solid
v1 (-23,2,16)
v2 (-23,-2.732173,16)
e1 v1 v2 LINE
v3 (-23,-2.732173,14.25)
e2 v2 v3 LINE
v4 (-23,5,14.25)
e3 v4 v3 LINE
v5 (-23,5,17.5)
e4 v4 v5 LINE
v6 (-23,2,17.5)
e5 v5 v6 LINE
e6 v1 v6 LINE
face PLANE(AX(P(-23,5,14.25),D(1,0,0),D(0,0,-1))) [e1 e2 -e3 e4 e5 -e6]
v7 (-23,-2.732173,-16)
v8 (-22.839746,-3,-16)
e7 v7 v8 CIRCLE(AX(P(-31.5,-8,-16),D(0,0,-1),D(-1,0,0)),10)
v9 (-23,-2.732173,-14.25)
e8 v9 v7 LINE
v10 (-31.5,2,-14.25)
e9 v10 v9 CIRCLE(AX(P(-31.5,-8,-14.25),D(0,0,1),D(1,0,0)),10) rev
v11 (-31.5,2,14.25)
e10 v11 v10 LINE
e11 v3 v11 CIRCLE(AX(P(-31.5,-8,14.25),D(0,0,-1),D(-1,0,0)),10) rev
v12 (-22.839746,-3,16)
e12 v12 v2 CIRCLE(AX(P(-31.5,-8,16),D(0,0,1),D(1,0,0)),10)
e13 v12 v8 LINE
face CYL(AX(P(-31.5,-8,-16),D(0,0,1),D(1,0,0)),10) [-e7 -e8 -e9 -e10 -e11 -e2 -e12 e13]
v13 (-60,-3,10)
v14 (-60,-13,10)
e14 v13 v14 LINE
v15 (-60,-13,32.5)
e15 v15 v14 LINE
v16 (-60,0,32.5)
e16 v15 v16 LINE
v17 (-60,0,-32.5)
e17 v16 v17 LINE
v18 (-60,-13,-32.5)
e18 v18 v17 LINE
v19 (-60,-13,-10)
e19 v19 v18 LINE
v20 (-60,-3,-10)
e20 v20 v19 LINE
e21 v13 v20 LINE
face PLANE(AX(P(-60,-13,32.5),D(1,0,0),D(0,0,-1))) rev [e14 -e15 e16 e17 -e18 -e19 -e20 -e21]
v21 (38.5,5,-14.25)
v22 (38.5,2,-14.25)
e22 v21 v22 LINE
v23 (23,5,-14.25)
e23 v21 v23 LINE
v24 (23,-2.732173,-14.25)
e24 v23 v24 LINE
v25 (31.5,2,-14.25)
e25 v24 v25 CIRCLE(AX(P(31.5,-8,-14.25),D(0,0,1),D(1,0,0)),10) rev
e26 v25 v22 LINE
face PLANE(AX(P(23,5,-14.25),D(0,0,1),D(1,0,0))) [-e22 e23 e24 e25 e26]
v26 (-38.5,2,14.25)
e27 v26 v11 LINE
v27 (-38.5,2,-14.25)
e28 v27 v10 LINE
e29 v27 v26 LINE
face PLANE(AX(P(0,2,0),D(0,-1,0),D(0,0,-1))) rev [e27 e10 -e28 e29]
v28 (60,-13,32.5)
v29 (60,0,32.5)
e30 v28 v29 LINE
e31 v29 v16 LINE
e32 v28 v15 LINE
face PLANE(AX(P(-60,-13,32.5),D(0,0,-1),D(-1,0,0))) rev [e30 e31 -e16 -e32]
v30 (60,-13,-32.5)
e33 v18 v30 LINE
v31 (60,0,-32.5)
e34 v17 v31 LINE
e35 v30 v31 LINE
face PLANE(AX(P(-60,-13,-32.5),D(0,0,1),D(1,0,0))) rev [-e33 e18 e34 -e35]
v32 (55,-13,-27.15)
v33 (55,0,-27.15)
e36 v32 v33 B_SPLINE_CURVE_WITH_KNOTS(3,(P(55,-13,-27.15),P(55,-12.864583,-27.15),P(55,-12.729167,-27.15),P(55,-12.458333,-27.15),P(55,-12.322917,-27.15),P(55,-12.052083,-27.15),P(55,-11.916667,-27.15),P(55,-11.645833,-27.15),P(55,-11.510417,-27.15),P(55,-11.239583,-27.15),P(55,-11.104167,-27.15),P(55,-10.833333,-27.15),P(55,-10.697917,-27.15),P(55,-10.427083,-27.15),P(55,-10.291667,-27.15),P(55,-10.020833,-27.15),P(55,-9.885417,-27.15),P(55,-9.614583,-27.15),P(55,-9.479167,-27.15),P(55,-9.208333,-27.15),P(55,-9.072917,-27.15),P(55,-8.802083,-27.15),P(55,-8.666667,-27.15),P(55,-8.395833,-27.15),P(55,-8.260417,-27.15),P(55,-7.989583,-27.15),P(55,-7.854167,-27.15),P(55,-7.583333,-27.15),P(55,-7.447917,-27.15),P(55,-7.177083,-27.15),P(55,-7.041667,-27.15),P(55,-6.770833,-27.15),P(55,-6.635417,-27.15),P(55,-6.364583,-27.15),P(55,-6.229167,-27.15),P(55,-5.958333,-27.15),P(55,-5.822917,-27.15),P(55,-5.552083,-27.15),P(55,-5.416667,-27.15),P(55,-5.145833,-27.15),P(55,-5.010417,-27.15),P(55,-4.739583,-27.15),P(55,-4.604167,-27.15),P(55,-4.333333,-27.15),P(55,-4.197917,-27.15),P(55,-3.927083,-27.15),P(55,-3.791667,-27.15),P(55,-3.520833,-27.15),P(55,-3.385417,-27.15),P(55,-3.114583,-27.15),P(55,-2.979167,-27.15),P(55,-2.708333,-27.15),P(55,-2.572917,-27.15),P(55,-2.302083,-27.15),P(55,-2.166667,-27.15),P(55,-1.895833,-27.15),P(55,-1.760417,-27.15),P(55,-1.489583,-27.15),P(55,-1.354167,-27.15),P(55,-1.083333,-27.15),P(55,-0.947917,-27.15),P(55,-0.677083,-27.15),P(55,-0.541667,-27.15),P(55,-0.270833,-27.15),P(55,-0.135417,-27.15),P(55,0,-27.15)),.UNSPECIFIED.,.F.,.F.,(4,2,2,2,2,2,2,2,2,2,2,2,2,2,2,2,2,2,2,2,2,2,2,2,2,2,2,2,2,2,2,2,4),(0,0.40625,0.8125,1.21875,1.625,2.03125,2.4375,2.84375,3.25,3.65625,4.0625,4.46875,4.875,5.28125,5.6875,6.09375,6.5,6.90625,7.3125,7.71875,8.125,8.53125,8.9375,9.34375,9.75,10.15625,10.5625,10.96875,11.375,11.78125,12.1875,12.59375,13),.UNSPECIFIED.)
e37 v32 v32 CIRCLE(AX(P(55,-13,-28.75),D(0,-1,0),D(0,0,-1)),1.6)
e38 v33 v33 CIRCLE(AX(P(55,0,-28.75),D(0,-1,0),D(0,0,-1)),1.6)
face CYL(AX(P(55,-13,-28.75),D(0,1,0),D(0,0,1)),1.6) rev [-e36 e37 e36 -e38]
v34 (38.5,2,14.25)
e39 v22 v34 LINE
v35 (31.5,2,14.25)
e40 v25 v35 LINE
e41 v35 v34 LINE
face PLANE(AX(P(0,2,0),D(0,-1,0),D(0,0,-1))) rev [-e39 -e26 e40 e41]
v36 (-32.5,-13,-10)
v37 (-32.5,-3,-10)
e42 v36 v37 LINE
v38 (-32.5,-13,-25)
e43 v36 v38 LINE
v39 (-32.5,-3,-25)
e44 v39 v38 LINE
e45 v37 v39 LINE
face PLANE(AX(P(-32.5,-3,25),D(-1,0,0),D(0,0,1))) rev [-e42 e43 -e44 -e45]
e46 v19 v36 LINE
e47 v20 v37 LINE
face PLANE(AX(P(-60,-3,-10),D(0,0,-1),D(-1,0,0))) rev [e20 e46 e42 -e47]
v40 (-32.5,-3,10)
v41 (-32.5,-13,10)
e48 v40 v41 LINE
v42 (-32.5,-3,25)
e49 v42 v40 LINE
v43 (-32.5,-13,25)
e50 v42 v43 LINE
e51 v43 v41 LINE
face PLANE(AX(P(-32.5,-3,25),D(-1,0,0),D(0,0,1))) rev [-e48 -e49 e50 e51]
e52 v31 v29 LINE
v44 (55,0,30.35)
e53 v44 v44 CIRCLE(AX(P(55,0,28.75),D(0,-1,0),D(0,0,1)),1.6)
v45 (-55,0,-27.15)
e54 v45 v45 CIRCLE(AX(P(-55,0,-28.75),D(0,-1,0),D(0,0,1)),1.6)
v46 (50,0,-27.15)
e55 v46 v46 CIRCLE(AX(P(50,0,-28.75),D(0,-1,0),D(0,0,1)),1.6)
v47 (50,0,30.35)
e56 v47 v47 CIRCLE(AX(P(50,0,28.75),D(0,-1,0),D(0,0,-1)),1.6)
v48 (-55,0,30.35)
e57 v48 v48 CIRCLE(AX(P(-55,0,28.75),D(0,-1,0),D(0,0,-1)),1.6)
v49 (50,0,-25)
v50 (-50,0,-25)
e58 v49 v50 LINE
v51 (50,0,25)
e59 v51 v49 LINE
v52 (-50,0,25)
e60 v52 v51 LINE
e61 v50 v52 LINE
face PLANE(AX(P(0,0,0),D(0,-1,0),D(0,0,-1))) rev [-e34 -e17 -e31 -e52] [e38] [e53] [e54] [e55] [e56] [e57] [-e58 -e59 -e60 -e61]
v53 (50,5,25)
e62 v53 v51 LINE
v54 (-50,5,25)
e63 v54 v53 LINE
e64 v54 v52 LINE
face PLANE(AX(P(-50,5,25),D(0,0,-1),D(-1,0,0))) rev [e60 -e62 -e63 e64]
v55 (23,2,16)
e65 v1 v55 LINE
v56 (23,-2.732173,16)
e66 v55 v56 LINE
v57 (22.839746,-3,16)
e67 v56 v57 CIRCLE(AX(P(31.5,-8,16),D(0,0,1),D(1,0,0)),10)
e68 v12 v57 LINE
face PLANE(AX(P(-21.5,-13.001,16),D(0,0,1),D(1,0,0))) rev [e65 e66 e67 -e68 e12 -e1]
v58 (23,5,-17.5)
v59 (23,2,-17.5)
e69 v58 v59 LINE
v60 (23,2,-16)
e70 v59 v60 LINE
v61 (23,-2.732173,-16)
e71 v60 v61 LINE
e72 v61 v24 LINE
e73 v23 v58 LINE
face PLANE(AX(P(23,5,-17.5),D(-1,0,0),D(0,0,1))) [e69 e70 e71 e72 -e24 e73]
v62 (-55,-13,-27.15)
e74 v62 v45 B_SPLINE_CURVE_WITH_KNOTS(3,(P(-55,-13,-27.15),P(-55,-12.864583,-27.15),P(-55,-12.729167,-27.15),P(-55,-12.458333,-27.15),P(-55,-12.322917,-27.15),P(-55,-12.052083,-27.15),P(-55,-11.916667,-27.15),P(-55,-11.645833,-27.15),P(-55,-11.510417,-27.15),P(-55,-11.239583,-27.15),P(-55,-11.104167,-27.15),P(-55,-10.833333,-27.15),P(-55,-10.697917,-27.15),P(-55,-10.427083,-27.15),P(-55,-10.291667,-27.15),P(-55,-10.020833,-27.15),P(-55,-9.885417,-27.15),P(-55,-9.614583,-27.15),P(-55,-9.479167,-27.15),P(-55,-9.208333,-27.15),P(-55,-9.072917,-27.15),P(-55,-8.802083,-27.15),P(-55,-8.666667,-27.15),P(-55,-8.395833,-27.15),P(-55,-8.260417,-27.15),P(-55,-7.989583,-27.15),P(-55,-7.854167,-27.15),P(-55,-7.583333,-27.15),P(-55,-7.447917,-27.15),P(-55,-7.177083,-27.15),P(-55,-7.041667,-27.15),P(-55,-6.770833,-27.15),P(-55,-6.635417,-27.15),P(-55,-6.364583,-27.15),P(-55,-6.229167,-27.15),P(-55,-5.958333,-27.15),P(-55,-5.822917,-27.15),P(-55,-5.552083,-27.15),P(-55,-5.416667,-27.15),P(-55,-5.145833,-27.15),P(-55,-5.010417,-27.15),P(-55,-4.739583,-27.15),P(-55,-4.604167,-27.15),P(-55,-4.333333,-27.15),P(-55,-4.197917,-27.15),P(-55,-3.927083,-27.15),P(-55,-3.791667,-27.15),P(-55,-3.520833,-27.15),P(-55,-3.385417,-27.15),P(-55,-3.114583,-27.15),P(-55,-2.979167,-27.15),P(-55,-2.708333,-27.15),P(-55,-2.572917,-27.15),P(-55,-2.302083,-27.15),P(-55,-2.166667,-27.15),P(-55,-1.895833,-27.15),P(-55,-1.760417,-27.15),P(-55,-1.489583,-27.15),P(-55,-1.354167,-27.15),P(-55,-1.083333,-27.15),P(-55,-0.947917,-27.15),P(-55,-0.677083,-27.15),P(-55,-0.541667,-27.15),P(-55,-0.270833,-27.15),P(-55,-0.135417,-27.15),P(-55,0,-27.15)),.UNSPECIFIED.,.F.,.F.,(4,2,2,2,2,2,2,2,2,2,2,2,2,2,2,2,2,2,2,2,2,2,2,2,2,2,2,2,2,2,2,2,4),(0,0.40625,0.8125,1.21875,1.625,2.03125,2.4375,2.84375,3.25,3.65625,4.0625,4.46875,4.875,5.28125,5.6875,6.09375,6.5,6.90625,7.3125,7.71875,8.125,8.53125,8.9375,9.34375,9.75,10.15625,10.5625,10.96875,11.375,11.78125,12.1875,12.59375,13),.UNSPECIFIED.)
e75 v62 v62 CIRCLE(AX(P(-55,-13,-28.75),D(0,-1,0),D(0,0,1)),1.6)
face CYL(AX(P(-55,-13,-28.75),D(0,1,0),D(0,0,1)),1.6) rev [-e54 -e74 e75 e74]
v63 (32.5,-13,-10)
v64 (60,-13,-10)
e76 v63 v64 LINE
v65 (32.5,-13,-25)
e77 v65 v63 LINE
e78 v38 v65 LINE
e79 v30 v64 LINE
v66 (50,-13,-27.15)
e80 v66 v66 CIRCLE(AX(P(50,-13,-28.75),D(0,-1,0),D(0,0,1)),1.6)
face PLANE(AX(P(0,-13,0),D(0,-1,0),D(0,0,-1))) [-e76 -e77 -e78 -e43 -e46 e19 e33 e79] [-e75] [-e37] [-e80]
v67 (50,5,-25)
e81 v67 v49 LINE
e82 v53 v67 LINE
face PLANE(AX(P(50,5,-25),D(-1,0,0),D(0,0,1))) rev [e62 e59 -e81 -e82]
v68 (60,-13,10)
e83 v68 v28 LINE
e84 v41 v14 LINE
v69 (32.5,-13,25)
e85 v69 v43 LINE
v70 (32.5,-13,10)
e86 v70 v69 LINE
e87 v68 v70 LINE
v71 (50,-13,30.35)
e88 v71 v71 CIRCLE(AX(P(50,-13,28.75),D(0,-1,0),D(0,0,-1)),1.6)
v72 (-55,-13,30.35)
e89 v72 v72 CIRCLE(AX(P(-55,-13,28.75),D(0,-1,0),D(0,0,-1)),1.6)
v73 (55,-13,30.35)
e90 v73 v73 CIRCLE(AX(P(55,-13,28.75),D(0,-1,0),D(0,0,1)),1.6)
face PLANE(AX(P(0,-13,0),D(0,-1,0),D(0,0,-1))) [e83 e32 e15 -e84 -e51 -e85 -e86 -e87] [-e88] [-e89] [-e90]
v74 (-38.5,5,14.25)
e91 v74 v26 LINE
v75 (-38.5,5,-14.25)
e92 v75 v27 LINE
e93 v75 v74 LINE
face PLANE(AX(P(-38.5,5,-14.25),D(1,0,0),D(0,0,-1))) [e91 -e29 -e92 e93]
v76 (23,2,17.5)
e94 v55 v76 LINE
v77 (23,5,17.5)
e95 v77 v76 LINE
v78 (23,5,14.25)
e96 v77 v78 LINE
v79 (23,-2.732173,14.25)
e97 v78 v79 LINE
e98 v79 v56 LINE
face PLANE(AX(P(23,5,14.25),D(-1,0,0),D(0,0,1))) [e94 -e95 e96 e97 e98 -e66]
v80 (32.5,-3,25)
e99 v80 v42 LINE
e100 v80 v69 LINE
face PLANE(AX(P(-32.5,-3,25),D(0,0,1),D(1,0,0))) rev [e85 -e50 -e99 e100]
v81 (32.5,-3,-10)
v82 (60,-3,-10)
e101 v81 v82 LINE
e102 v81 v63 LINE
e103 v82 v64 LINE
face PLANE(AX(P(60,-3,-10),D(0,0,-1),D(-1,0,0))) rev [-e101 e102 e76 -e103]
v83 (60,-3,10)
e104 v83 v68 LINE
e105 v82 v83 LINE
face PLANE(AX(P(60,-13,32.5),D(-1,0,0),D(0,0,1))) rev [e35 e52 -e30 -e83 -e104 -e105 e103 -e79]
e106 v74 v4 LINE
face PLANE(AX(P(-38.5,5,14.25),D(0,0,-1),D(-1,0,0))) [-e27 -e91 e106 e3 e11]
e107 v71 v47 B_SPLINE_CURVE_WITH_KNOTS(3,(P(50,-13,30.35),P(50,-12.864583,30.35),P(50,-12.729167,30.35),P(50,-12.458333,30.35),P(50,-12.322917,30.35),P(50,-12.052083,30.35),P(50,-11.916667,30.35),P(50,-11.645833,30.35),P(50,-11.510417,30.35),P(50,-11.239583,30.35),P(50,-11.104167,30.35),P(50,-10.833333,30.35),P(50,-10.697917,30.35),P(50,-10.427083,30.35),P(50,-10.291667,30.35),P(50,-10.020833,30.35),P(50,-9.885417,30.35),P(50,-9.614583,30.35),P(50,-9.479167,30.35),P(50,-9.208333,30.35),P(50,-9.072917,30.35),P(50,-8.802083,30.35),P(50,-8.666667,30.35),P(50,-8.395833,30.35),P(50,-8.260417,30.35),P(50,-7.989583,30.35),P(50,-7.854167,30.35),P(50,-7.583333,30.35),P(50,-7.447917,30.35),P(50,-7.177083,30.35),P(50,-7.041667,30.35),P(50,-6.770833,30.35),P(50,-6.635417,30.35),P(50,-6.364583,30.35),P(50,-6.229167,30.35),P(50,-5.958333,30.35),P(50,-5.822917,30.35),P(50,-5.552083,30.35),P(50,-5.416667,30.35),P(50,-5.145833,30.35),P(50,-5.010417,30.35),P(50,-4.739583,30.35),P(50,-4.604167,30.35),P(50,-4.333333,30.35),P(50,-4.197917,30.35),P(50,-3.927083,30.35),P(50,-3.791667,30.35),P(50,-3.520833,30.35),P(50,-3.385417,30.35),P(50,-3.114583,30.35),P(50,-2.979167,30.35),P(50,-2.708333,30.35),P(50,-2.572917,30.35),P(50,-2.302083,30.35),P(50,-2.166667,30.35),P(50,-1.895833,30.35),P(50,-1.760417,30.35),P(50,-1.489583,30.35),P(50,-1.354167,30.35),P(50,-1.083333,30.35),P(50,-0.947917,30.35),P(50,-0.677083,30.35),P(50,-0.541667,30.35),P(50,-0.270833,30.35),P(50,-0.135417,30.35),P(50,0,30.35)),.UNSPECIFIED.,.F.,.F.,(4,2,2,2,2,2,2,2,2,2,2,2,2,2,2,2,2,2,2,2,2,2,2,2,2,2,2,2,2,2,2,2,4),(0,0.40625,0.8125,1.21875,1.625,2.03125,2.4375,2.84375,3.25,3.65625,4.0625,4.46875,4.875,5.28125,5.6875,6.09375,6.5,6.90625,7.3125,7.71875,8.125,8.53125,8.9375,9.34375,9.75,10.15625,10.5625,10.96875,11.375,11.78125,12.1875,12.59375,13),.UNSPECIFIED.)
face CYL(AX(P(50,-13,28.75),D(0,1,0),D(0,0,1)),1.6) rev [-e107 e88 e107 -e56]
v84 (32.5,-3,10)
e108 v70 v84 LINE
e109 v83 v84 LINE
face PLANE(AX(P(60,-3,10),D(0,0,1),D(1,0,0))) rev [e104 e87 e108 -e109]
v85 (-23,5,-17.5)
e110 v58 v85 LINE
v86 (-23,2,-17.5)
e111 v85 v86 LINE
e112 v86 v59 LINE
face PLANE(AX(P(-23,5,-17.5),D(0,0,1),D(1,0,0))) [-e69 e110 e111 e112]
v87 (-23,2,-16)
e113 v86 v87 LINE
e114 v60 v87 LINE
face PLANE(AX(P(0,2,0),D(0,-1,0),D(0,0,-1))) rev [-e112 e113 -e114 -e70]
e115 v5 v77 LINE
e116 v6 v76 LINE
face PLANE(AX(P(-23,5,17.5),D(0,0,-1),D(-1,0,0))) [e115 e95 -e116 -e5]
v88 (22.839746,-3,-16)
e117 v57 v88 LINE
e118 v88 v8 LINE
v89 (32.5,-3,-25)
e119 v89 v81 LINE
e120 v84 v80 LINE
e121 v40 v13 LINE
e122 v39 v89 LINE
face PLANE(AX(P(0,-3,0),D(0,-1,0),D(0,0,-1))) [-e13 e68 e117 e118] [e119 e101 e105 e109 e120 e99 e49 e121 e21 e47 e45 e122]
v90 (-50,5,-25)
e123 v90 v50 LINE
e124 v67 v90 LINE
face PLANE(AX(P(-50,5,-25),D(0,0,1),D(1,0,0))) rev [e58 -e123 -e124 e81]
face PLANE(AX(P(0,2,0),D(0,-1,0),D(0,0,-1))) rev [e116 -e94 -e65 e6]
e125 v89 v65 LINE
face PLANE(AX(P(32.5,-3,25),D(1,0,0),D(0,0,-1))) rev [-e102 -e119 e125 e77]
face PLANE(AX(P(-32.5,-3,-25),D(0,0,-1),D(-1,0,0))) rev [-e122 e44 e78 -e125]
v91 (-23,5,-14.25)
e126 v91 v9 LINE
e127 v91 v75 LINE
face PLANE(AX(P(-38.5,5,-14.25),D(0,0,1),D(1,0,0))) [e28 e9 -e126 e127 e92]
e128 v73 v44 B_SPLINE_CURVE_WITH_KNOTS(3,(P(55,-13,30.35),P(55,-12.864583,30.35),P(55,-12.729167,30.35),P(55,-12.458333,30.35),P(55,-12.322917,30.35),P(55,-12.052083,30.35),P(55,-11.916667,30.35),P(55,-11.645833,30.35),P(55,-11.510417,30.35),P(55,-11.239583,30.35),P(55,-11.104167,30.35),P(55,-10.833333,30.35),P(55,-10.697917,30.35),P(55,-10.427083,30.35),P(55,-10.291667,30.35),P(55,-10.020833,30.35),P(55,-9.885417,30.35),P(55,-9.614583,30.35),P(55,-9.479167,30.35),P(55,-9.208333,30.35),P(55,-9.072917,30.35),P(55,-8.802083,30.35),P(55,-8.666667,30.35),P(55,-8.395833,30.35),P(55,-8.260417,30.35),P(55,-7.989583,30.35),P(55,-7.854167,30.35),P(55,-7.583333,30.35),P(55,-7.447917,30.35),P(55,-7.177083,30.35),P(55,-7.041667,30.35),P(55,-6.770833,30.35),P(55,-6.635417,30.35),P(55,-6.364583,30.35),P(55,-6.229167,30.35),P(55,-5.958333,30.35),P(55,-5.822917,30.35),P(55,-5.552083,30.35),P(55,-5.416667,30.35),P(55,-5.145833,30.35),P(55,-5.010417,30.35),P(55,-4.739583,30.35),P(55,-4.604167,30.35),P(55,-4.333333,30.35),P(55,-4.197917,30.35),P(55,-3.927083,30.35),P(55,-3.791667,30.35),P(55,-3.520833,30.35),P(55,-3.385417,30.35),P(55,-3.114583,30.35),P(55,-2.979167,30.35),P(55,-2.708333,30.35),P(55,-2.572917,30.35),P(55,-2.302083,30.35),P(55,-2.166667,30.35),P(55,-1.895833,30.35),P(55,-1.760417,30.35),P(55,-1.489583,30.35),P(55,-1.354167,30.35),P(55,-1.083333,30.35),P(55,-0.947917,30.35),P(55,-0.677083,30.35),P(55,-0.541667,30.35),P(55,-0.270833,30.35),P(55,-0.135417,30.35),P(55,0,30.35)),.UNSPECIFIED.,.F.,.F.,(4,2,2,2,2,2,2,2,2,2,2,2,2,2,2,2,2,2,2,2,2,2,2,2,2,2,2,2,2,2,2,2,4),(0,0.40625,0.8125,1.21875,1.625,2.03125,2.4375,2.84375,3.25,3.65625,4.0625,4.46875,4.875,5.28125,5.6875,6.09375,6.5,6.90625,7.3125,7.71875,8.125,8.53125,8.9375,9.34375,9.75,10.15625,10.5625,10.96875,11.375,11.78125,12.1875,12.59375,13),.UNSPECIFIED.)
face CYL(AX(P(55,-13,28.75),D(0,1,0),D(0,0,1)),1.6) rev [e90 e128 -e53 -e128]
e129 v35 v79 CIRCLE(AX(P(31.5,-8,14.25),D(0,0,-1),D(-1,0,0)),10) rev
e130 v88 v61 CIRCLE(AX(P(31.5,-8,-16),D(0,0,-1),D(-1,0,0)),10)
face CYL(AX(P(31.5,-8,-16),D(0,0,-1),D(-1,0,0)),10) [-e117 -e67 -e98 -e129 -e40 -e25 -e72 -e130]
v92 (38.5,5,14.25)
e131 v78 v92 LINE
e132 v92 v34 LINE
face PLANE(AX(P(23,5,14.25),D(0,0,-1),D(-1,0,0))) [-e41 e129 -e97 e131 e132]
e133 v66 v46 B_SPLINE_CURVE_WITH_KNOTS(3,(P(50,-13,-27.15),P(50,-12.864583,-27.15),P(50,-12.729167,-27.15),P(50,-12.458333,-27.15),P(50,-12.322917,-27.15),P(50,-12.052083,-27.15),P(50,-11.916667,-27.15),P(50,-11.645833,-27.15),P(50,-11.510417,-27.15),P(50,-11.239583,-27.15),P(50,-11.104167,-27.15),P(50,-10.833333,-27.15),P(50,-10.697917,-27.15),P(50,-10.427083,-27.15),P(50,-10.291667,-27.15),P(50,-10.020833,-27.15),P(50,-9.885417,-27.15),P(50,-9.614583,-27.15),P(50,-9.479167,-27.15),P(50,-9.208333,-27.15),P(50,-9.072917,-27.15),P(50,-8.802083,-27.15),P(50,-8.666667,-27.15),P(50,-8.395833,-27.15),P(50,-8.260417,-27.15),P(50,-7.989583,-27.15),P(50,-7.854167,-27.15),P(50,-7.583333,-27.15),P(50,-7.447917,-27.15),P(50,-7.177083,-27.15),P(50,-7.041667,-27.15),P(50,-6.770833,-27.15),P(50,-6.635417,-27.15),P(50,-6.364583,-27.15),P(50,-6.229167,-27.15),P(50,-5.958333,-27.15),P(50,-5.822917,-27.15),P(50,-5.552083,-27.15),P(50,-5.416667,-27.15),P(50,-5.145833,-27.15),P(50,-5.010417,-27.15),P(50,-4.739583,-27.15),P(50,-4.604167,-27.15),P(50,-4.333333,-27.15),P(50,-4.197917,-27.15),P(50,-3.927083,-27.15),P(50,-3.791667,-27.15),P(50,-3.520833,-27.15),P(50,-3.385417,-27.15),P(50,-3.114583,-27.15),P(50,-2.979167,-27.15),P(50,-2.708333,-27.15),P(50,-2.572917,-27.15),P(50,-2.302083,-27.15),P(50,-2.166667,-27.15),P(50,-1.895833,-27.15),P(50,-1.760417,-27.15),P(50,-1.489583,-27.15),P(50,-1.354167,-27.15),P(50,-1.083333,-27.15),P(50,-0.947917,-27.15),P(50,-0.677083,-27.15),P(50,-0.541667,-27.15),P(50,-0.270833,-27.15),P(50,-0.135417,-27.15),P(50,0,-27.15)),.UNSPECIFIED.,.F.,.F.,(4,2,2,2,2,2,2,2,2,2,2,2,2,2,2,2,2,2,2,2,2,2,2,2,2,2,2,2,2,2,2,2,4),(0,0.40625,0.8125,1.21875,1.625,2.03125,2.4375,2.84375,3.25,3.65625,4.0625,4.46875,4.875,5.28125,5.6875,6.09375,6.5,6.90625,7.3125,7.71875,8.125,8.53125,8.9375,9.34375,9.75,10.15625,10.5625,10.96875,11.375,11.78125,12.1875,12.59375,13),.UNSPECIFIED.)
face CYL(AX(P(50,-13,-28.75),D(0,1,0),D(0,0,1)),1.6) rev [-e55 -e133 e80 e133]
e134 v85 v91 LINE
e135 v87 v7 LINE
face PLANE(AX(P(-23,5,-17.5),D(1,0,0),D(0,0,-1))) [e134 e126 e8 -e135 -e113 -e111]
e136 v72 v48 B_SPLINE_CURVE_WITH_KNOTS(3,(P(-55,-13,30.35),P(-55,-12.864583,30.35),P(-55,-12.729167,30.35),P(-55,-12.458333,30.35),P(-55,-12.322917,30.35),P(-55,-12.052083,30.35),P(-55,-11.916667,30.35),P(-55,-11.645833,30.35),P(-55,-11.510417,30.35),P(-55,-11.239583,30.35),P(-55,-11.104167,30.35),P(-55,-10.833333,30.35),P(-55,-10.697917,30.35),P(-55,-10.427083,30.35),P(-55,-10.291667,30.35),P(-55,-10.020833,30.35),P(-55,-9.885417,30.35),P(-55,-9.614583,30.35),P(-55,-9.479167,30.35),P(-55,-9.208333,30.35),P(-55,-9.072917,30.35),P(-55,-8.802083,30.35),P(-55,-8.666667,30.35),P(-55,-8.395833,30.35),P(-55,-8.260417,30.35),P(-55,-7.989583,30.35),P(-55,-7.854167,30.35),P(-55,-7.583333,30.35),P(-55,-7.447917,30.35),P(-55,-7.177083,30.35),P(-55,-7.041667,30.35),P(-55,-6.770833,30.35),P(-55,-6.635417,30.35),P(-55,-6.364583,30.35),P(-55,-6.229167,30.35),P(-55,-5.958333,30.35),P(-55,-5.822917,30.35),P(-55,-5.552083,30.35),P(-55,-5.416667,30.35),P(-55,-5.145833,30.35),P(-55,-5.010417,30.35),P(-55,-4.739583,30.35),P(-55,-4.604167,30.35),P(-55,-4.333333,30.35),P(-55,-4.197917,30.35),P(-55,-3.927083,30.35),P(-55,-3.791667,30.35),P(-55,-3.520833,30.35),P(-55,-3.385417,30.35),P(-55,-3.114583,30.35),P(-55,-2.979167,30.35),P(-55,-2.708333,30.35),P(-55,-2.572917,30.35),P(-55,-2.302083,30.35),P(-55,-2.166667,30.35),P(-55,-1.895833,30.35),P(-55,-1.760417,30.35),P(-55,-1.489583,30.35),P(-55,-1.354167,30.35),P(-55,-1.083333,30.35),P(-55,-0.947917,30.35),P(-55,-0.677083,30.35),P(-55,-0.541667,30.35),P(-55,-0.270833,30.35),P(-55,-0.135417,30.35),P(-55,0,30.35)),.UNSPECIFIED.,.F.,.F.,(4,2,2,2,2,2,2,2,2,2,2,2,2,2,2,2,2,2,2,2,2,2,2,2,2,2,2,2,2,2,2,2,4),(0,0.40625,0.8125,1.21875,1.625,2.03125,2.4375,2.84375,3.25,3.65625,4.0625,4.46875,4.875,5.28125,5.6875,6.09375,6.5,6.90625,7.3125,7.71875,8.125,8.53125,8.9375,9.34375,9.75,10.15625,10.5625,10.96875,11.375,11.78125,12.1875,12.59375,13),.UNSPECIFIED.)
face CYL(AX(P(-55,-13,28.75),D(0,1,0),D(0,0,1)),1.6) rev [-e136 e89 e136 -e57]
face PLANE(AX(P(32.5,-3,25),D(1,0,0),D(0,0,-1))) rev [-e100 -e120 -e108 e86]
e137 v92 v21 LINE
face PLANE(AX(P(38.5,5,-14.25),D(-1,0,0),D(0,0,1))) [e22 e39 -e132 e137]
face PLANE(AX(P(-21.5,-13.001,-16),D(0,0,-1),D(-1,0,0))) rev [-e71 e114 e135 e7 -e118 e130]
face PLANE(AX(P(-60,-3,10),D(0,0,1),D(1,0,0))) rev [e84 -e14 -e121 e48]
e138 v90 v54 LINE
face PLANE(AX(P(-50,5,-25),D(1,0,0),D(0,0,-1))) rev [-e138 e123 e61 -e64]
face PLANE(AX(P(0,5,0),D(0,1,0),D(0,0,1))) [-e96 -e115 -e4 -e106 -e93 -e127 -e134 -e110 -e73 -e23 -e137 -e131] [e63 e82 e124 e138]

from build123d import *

# Parameters (mm, degrees)
BOSS_EXTRUDE3_DEPTH = 2
SKETCH1_6_W         = 100
SKETCH1_6_H         = 50
BOSS_EXTRUDE4_DEPTH = 5
SKETCH2_W           = 120
SKETCH2_H           = 65
SKETCH2_R           = 1.6
BOSS_EXTRUDE5_DEPTH = 13
SKETCH2_2_W         = 120
SKETCH2_2_H         = 65
SKETCH2_2_R         = 1.6
BOSS_EXTRUDE6_DEPTH = 3
CUT_EXTRUDE1_REACH  = 71.866
SKETCH7_W           = 43
SKETCH7_H           = 32
FILLET1_R           = 10
SKETCH8_W           = 38.5
SKETCH8_H           = 20
CUT_EXTRUDE2_DEPTH  = 10
SKETCH9_W           = 65
SKETCH9_H           = 50
CUT_EXTRUDE3_DEPTH  = 10


with BuildPart() as part:
    # Sketch1 → Boss-Extrude3 (new body)
    with BuildSketch(Plane(origin=(0, 0, 0), x_dir=(1, 0, 0), z_dir=(0, 1, 0))):
        Polygon((23, -14.25), (23, -17.5), (-23, -17.5), (-23, -14.25), (-38.5, -14.25), (-38.5, 14.25), (-23, 14.25), (-23, 17.5), (23, 17.5), (23, 14.25), (38.5, 14.25), (38.5, -14.25), align=None)
    extrude(amount=BOSS_EXTRUDE3_DEPTH)

    # Sketch1<6> → Boss-Extrude4 (add)
    with BuildSketch(Plane(origin=(0, 0, 0), x_dir=(1, 0, 0), z_dir=(0, 1, 0))):
        Rectangle(SKETCH1_6_W, SKETCH1_6_H)
        Polygon((23, -14.25), (23, -17.5), (-23, -17.5), (-23, -14.25), (-38.5, -14.25), (-38.5, 14.25), (-23, 14.25), (-23, 17.5), (23, 17.5), (23, 14.25), (38.5, 14.25), (38.5, -14.25), align=None, mode=Mode.SUBTRACT)
    extrude(amount=BOSS_EXTRUDE4_DEPTH)

    # Sketch2 → Boss-Extrude5 (add)
    with BuildSketch(Plane.XZ):
        Rectangle(SKETCH2_W, SKETCH2_H)
        with Locations(Location((-55, 28.75, 0), (0, 0, 90))):
            Circle(SKETCH2_R, mode=Mode.SUBTRACT)
        with Locations(Location((55, 28.75, 0), (0, 0, 90))):
            Circle(SKETCH2_R, mode=Mode.SUBTRACT)
        with Locations(Location((55, -28.75, 0), (0, 0, 90))):
            Circle(SKETCH2_R, mode=Mode.SUBTRACT)
        with Locations(Location((-55, -28.75, 0), (0, 0, 90))):
            Circle(SKETCH2_R, mode=Mode.SUBTRACT)
        with Locations(Location((50, 28.75, 0), (0, 0, 90))):
            Circle(SKETCH2_R, mode=Mode.SUBTRACT)
        with Locations(Location((50, -28.75, 0), (0, 0, 90))):
            Circle(SKETCH2_R, mode=Mode.SUBTRACT)
    extrude(amount=BOSS_EXTRUDE5_DEPTH)

    # Sketch2<2> → Boss-Extrude6 (add)
    with BuildSketch(Plane.XZ):
        Rectangle(SKETCH2_2_W, SKETCH2_2_H)
        with Locations(Location((-55, 28.75, 0), (0, 0, 90))):
            Circle(SKETCH2_2_R, mode=Mode.SUBTRACT)
        with Locations(Location((55, 28.75, 0), (0, 0, 90))):
            Circle(SKETCH2_2_R, mode=Mode.SUBTRACT)
        with Locations(Location((55, -28.75, 0), (0, 0, 90))):
            Circle(SKETCH2_2_R, mode=Mode.SUBTRACT)
        with Locations(Location((-55, -28.75, 0), (0, 0, 90))):
            Circle(SKETCH2_2_R, mode=Mode.SUBTRACT)
        with Locations(Location((50, 28.75, 0), (0, 0, 90))):
            Circle(SKETCH2_2_R, mode=Mode.SUBTRACT)
        with Locations(Location((50, -28.75, 0), (0, 0, 90))):
            Circle(SKETCH2_2_R, mode=Mode.SUBTRACT)
    extrude(amount=BOSS_EXTRUDE6_DEPTH)

    # Sketch7 → Cut-Extrude1 (cut, up to next)
    with BuildSketch(Plane(origin=(0, 2, 0), x_dir=(1, 0, 0), z_dir=(0, 1, 0)), mode=Mode.PRIVATE) as cut_extrude1_sk1:
        Rectangle(SKETCH7_W, SKETCH7_H)
    cut_extrude1_tool1 = extrude(cut_extrude1_sk1.sketch, amount=-CUT_EXTRUDE1_REACH, mode=Mode.PRIVATE) & part.part
    add(cut_extrude1_tool1.solids().sort_by_distance((0, 2, 0))[0], mode=Mode.SUBTRACT)

    # Fillet1
    # the kernel refuses this fillet: 10 mm, written as the material it takes off along each edge
    with BuildSketch(Plane(origin=(-21.5, 2, 16), x_dir=(0, -1, 0), z_dir=(0, 0, -1))) as fillet1_piece_1_section:
        with BuildLine():
            CenterArc((FILLET1_R, FILLET1_R), FILLET1_R, 180, 90)
            Line((0, FILLET1_R), (0, 0))
            Line((0, 0), (FILLET1_R, 0))
        make_face()
    fillet1_piece_1 = extrude(amount=32, mode=Mode.PRIVATE)
    fillet1_piece_1 = split(fillet1_piece_1, bisect_by=Plane(origin=(-23, -2.387167078, 15.125), z_dir=(1, 0, 0)), keep=Keep.TOP, mode=Mode.PRIVATE)
    add(fillet1_piece_1, mode=Mode.SUBTRACT)
    with BuildSketch(Plane(origin=(-21.5, 2, 41), x_dir=(0, -1, 0), z_dir=(0, 0, -1))) as fillet1_piece_2_section:
        with BuildLine():
            CenterArc((FILLET1_R, FILLET1_R), FILLET1_R, 180, 90)
            Line((0, FILLET1_R), (0, 0))
            Line((0, 0), (FILLET1_R, 0))
        make_face()
    fillet1_piece_2 = extrude(amount=82, mode=Mode.PRIVATE)
    fillet1_piece_2 = split(fillet1_piece_2, bisect_by=Plane(origin=(-23.780995079, -0.852225246, -14.25), z_dir=(0, 0, 1)), keep=Keep.TOP, mode=Mode.PRIVATE)
    fillet1_piece_2 = split(fillet1_piece_2, bisect_by=Plane(origin=(-23.780995079, -0.852225246, 14.25), z_dir=(0, 0, -1)), keep=Keep.TOP, mode=Mode.PRIVATE)
    add(fillet1_piece_2, mode=Mode.SUBTRACT)
    with BuildSketch(Plane(origin=(21.5, 2, -16), x_dir=(0, -1, 0), z_dir=(0, 0, 1))) as fillet1_piece_3_section:
        with BuildLine():
            CenterArc((FILLET1_R, FILLET1_R), FILLET1_R, 180, 90)
            Line((0, FILLET1_R), (0, 0))
            Line((0, 0), (FILLET1_R, 0))
        make_face()
    fillet1_piece_3 = extrude(amount=32, mode=Mode.PRIVATE)
    fillet1_piece_3 = split(fillet1_piece_3, bisect_by=Plane(origin=(23, -2.387167078, -15.125), z_dir=(-1, 0, 0)), keep=Keep.TOP, mode=Mode.PRIVATE)
    add(fillet1_piece_3, mode=Mode.SUBTRACT)
    with BuildSketch(Plane(origin=(21.5, 2, -41), x_dir=(0, -1, 0), z_dir=(0, 0, 1))) as fillet1_piece_4_section:
        with BuildLine():
            CenterArc((FILLET1_R, FILLET1_R), FILLET1_R, 180, 90)
            Line((0, FILLET1_R), (0, 0))
            Line((0, 0), (FILLET1_R, 0))
        make_face()
    fillet1_piece_4 = extrude(amount=82, mode=Mode.PRIVATE)
    fillet1_piece_4 = split(fillet1_piece_4, bisect_by=Plane(origin=(23.780995079, -0.852225246, 14.25), z_dir=(0, 0, -1)), keep=Keep.TOP, mode=Mode.PRIVATE)
    fillet1_piece_4 = split(fillet1_piece_4, bisect_by=Plane(origin=(23.780995079, -0.852225246, -14.25), z_dir=(0, 0, 1)), keep=Keep.TOP, mode=Mode.PRIVATE)
    add(fillet1_piece_4, mode=Mode.SUBTRACT)

    # Sketch8 → Cut-Extrude2 (cut)
    with BuildSketch(Plane.XZ.offset(13)):
        with Locations((-40.75, 0)):
            Rectangle(SKETCH8_W, SKETCH8_H)
        with Locations((40.75, 0)):
            Rectangle(SKETCH8_W, SKETCH8_H)
    extrude(amount=-CUT_EXTRUDE2_DEPTH, mode=Mode.SUBTRACT)

    # Sketch9 → Cut-Extrude3 (cut)
    with BuildSketch(Plane(origin=(0, -13, 0), x_dir=(-1, 0, 0), z_dir=(0, -1, 0))):
        Rectangle(SKETCH9_W, SKETCH9_H)
    extrude(amount=-CUT_EXTRUDE3_DEPTH, mode=Mode.SUBTRACT)


solid = part.part
